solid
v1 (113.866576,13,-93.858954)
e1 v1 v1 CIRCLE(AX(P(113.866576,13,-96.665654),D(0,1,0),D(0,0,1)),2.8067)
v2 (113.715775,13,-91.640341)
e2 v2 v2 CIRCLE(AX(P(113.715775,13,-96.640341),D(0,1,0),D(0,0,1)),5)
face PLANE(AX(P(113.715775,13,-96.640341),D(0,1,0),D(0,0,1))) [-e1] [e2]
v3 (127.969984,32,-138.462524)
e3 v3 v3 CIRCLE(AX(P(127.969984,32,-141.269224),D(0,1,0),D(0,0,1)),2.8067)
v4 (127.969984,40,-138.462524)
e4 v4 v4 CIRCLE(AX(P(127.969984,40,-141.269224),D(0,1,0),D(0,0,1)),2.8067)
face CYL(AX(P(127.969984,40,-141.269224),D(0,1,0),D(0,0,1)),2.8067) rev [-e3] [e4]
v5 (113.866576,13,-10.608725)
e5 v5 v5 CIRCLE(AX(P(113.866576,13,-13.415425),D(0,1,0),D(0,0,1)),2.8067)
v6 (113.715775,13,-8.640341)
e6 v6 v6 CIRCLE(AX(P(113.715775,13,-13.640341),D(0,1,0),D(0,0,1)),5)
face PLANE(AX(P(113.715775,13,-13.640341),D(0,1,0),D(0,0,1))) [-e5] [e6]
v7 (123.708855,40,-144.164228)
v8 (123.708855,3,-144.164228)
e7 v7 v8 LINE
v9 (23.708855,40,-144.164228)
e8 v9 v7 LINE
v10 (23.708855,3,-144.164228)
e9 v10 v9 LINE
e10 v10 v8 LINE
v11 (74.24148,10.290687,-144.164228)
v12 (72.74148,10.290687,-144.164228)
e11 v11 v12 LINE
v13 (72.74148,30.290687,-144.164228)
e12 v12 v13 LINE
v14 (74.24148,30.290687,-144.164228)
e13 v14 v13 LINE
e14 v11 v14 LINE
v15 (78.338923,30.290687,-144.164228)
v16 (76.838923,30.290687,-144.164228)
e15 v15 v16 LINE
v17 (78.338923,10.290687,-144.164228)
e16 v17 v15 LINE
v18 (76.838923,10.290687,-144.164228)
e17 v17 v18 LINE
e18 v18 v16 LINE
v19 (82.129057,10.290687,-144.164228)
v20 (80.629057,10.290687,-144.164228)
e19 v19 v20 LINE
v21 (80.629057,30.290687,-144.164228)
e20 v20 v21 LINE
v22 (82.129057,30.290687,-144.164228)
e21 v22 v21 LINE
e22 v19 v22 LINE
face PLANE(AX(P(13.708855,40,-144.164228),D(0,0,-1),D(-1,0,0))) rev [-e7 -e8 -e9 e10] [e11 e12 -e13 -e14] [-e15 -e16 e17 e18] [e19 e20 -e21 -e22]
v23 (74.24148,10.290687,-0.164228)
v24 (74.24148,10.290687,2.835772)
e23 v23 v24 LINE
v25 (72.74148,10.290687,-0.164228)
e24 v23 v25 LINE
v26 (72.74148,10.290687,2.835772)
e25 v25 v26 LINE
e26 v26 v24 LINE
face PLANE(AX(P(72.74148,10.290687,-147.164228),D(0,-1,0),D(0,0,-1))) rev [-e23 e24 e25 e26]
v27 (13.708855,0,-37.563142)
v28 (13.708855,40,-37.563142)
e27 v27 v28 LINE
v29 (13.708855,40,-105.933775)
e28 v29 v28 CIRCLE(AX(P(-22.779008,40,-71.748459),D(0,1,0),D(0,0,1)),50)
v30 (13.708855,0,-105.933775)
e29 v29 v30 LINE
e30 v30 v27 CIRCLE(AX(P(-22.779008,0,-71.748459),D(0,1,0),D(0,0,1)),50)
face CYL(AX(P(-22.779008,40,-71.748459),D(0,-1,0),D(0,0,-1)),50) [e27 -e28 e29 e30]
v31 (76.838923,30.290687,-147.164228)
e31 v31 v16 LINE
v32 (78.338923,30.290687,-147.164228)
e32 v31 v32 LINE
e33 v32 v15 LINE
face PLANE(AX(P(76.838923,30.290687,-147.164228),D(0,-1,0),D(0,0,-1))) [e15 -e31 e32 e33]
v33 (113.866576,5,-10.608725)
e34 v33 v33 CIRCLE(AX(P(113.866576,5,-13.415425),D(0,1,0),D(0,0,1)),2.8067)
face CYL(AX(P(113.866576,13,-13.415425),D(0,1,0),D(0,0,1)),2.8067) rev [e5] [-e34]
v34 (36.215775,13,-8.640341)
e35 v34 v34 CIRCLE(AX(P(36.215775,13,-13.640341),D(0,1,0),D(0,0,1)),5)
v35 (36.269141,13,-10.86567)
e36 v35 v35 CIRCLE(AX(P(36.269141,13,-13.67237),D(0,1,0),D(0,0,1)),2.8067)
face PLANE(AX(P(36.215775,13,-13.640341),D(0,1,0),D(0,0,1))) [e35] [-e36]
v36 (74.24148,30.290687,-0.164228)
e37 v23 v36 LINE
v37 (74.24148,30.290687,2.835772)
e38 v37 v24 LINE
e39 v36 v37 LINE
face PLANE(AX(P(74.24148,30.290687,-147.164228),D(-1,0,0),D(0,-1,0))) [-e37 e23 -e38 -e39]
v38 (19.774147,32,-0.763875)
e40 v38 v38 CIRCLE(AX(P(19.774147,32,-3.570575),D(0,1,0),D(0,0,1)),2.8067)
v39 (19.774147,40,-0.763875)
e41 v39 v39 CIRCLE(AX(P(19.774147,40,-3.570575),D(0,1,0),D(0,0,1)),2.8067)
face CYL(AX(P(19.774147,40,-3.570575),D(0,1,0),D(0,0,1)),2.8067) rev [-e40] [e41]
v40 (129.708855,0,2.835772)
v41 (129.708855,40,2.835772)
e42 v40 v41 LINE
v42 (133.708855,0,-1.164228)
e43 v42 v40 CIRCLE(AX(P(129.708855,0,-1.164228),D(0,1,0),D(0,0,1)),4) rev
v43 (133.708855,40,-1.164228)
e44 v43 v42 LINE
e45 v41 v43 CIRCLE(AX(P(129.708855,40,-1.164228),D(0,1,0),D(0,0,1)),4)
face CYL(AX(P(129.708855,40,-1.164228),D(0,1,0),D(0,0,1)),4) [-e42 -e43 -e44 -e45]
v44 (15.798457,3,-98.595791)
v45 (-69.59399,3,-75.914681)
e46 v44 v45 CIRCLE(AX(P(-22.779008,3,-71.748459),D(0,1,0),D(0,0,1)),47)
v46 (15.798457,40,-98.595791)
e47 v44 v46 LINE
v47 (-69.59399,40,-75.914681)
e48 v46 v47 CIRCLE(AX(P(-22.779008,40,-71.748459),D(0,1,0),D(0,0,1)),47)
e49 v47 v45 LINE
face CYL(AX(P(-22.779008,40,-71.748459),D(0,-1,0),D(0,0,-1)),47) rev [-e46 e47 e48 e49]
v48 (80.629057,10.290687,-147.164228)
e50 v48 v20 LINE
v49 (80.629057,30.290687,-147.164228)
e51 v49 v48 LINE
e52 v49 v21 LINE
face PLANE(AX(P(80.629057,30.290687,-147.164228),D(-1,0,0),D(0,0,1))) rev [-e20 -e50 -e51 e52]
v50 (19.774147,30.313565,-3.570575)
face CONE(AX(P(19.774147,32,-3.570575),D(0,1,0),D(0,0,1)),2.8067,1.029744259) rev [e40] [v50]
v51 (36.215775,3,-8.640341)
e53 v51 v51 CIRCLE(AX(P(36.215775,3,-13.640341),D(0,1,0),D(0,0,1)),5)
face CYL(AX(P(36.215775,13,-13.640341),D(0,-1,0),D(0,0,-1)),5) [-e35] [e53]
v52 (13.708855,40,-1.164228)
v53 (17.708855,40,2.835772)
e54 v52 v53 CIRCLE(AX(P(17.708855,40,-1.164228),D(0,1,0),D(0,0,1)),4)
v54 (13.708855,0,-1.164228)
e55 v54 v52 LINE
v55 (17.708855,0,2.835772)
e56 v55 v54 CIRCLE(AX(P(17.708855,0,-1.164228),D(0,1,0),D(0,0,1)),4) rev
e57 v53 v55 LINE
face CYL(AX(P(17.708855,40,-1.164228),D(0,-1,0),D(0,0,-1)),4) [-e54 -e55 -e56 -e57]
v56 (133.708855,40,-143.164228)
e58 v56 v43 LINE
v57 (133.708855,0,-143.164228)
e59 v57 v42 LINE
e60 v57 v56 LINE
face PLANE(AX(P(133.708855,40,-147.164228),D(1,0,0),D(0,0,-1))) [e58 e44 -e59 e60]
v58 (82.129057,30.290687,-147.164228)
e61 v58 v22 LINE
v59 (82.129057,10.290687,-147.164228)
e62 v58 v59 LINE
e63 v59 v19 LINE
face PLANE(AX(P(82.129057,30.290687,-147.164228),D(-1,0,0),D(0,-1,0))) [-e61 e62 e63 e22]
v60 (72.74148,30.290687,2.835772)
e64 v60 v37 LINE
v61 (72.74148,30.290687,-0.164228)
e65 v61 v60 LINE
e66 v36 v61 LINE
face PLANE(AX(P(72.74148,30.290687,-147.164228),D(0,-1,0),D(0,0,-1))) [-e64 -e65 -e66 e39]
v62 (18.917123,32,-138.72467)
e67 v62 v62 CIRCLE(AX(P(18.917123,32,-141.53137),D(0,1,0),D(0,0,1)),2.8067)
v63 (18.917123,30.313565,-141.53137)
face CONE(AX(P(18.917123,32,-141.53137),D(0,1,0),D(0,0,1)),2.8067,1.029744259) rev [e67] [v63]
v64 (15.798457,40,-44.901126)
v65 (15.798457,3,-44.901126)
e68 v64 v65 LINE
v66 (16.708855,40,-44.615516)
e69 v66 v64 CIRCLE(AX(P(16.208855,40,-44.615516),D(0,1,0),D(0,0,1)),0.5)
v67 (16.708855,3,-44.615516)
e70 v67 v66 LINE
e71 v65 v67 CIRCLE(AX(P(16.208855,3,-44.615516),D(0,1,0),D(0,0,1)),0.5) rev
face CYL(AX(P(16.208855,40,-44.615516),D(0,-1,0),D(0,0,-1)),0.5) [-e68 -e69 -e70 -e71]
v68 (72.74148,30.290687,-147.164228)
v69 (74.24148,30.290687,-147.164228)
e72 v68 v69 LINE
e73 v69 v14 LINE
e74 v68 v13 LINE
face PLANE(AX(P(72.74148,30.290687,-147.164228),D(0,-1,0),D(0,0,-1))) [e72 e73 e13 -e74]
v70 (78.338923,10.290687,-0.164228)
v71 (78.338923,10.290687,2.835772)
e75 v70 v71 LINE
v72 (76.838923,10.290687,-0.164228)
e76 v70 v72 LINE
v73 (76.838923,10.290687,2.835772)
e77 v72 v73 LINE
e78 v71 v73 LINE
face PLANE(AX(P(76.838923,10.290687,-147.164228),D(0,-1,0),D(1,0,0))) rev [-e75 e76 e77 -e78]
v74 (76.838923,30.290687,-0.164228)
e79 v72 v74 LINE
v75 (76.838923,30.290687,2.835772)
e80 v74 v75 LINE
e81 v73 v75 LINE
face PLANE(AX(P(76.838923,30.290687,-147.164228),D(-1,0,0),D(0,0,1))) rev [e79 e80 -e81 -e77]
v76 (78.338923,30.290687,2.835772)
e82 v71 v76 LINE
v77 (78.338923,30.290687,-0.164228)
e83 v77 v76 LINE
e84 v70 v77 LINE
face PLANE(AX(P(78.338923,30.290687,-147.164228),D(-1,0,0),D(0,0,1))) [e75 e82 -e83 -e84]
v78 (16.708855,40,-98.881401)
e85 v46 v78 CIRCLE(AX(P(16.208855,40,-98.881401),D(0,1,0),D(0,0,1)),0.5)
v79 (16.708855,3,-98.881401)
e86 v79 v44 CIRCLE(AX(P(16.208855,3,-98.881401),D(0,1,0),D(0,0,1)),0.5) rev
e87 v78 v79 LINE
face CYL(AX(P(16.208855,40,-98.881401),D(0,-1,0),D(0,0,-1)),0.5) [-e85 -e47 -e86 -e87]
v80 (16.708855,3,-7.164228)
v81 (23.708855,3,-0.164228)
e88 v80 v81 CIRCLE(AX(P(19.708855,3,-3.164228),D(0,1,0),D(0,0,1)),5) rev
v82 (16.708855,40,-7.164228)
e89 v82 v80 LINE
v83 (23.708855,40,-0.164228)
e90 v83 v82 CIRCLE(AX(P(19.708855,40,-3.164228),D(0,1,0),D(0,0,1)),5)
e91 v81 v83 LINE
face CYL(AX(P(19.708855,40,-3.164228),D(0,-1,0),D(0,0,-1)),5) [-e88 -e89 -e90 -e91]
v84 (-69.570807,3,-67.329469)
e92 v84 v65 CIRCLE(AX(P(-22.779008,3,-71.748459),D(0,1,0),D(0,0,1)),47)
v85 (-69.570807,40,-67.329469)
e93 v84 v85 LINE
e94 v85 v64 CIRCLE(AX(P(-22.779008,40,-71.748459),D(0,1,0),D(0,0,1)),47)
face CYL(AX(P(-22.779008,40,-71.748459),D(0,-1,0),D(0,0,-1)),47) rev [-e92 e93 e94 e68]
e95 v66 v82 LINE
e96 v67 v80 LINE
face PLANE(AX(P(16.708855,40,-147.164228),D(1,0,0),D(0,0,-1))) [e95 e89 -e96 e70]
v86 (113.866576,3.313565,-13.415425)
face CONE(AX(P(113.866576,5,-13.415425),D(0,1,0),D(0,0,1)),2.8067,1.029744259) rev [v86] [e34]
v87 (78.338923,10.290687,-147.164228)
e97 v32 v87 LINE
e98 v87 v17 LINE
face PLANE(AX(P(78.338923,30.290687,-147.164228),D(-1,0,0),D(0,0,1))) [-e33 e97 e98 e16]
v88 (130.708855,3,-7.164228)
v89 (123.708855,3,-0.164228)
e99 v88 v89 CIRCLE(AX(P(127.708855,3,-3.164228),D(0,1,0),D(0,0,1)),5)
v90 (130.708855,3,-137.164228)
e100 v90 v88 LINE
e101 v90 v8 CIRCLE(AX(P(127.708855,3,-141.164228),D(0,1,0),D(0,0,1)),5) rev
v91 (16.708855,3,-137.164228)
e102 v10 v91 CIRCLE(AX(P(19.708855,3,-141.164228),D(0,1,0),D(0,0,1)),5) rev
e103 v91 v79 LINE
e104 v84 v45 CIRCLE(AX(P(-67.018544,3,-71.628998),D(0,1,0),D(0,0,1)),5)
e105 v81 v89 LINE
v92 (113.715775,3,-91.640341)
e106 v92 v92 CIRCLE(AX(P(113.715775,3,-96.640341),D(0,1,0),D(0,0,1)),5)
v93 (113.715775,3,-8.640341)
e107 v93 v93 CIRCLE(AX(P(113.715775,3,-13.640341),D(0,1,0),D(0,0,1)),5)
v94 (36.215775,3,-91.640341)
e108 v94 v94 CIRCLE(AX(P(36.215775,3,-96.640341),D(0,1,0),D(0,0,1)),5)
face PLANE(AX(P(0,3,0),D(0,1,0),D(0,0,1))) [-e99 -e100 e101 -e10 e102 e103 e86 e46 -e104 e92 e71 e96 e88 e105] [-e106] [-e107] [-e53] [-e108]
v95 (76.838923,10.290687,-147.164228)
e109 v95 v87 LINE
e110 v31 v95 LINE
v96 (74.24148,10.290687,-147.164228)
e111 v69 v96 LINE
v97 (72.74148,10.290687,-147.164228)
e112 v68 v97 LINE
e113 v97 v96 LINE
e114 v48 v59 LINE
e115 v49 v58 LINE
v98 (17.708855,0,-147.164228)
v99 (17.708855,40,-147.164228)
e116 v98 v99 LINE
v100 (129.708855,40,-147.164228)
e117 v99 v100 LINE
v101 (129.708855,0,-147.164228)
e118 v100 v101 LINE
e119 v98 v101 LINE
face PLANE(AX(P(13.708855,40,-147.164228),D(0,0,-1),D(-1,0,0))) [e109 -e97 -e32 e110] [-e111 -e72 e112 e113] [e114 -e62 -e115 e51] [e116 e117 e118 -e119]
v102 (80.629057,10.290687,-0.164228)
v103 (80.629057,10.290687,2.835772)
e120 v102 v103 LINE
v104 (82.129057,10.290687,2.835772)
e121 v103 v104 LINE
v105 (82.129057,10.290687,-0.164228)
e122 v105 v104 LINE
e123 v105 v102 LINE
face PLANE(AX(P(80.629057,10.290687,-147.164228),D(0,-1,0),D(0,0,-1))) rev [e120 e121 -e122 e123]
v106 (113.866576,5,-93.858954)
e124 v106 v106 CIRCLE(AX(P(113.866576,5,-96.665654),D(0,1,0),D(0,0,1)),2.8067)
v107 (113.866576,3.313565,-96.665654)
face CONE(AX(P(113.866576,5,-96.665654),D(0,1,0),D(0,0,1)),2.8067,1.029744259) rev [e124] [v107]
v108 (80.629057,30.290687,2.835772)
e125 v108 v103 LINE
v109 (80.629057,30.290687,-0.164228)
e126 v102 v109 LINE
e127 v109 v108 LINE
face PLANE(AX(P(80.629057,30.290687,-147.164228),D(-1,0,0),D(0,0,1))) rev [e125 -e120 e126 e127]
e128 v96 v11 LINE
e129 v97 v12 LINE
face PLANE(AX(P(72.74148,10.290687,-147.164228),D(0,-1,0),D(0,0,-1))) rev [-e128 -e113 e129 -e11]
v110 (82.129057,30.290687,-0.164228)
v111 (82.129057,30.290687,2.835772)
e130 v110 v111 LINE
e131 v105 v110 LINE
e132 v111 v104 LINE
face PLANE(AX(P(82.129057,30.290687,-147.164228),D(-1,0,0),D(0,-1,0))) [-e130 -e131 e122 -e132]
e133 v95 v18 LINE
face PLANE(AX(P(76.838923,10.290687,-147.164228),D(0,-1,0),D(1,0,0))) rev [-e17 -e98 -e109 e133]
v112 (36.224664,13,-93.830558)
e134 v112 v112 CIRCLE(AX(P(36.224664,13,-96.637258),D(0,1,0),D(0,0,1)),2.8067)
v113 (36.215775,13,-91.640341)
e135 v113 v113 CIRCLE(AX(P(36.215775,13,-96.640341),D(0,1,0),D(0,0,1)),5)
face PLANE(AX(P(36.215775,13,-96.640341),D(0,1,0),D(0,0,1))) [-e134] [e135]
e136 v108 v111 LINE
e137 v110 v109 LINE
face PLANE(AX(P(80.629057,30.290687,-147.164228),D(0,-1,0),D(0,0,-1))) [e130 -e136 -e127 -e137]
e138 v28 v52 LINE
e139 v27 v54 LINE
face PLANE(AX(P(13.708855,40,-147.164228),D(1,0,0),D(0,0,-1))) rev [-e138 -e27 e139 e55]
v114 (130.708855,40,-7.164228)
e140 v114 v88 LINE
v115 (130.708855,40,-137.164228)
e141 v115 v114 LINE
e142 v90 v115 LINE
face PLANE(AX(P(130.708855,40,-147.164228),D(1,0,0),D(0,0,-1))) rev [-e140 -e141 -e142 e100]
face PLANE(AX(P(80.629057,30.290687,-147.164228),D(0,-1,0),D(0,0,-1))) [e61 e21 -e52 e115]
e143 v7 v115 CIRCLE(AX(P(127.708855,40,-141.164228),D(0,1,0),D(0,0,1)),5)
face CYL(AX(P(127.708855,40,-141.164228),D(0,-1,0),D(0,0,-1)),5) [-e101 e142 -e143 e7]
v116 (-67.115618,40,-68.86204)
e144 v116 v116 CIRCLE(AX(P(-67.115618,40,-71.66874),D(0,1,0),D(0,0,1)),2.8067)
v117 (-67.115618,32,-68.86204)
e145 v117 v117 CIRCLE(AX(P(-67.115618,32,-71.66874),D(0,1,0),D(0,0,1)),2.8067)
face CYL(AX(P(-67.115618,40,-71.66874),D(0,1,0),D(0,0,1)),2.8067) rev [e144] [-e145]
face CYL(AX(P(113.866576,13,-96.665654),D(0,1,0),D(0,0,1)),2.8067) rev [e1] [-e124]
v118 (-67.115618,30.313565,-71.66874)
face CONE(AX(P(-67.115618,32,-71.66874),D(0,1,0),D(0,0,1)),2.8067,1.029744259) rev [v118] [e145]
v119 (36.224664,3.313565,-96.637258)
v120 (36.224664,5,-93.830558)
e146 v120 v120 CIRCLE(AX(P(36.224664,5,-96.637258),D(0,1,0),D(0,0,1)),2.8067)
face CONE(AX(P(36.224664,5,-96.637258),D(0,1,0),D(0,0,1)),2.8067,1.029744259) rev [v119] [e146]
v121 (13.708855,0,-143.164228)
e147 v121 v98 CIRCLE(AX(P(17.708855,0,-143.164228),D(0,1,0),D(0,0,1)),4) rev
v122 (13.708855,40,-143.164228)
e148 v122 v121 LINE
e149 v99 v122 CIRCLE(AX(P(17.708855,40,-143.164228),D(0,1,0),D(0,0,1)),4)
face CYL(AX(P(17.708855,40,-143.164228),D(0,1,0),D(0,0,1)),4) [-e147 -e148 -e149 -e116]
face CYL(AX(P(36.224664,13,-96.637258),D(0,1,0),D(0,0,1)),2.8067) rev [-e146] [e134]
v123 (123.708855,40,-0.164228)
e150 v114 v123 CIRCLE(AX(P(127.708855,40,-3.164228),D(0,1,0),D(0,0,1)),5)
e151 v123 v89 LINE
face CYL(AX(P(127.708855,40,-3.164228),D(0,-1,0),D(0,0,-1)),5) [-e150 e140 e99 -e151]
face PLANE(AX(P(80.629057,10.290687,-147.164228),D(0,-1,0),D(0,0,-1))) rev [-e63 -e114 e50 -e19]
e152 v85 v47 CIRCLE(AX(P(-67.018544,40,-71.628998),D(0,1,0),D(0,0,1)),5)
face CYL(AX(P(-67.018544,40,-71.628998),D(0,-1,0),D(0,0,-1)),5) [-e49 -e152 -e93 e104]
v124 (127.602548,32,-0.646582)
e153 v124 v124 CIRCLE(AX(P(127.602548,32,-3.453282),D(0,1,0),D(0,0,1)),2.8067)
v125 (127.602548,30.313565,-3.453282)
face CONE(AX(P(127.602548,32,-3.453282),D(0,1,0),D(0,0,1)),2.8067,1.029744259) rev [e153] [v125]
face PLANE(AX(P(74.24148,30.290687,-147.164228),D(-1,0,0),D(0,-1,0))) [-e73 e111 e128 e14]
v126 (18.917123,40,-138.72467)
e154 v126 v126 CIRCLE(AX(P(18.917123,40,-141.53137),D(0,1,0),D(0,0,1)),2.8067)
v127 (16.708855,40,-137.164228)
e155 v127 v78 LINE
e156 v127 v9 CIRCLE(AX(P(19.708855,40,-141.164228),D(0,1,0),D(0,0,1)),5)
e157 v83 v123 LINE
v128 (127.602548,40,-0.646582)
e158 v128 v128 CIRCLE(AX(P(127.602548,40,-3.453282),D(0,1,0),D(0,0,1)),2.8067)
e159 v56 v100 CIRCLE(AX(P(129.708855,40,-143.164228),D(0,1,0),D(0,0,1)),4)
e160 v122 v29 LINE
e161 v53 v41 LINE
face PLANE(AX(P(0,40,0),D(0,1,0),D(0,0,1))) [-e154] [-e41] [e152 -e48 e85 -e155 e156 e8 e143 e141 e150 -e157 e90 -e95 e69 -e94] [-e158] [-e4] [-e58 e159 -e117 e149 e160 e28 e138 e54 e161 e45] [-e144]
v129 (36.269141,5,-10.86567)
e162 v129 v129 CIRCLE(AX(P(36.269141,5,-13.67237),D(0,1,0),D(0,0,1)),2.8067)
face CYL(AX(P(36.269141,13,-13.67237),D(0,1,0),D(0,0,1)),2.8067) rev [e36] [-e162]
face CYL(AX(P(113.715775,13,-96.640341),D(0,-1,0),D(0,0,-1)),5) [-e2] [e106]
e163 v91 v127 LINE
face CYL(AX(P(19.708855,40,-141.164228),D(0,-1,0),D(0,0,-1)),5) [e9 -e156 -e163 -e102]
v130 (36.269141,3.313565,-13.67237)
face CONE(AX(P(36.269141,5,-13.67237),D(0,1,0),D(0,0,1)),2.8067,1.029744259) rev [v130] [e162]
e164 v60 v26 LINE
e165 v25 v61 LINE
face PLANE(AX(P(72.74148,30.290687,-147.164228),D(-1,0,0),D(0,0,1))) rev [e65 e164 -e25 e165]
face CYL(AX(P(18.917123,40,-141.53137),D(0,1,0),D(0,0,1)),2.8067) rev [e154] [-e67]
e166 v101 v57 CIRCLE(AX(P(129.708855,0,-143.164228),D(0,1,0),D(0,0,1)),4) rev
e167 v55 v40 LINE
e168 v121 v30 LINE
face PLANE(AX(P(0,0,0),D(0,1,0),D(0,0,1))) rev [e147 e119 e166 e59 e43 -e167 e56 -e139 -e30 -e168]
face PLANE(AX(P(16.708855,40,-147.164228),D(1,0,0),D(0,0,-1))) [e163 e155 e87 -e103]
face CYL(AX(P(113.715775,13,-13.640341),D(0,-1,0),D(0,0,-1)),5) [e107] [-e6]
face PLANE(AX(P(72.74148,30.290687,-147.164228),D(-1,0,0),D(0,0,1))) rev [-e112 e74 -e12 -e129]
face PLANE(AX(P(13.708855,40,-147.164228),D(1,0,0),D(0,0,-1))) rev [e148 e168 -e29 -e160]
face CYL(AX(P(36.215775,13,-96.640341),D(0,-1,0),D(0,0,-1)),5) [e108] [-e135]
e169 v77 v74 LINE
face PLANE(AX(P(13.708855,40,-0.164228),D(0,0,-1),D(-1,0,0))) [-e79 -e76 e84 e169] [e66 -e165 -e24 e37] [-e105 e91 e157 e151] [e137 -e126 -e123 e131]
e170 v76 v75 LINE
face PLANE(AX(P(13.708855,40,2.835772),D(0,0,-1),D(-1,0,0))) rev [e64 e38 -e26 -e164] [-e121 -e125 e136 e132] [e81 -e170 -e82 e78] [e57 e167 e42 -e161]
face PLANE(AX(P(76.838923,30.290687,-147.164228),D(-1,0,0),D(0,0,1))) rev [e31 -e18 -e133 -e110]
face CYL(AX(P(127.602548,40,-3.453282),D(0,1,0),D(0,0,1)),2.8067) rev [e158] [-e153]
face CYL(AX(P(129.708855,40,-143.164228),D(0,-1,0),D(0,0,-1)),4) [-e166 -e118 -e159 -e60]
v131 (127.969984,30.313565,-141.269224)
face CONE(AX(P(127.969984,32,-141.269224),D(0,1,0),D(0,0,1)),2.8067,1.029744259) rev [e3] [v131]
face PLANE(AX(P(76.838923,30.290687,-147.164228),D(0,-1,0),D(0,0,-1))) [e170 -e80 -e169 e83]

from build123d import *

# Parameters (mm, degrees)
SKETCH8_W                      = 120
SKETCH8_H                      = 150
BOSS_EXTRUDE3_DEPTH            = 40
SKETCH9_R                      = 50
BOSS_EXTRUDE4_DEPTH            = 40
SHELL1_START                   = 3
SHELL1_DEPTH                   = 37
SKETCH17_R                     = 5
BOSS_EXTRUDE6_DEPTH            = 10
CUT_EXTRUDE9_DEPTH             = 203.818558951
CUT_EXTRUDE9_DEPTH_BACK        = 203.818558951
SKETCH11_W                     = 1.5
SKETCH11_H                     = 20
CUT_EXTRUDE10_DEPTH            = 205.88547515
CUT_EXTRUDE10_DEPTH_BACK       = 205.88547515
SKETCH12_W                     = 1.5
SKETCH12_H                     = 20
CUT_EXTRUDE11_DEPTH            = 203.818558951
CUT_EXTRUDE11_DEPTH_BACK       = 203.818558951
SKETCH15_W                     = 1.5
SKETCH15_H                     = 20
SKETCH28_R                     = 5
BOSS_EXTRUDE7_DEPTH            = 37
SKETCH29_R                     = 5
BOSS_EXTRUDE8_DEPTH            = 40
SKETCH30_R                     = 5
BOSS_EXTRUDE9_DEPTH            = 40
SKETCH31_R                     = 5
BOSS_EXTRUDE10_DEPTH           = 37
SKETCH32_R                     = 5
BOSS_EXTRUDE11_DEPTH           = 37
F_2_0_221_DIAMETER_HOLE1_D     = 5.6134
F_2_0_221_DIAMETER_HOLE1_DEPTH = 8
F_2_0_221_DIAMETER_HOLE1_TIP   = 1.686435499
F_2_0_221_DIAMETER_HOLE2_D     = 5.6134
F_2_0_221_DIAMETER_HOLE2_DEPTH = 8
F_2_0_221_DIAMETER_HOLE2_TIP   = 1.686435499
FILLET3_R                      = 4
FILLET2_R                      = 0.5


# Read off the part's stored shape, not the designer's step: Shell1
with BuildPart() as part:
    # Sketch8 → Boss-Extrude3 (new body)
    with BuildSketch(Plane(origin=(0, 0, 0), x_dir=(1, 0, 0), z_dir=(0, 1, 0))):
        with Locations((73.708855083, 72.164227744)):
            Rectangle(SKETCH8_W, SKETCH8_H)
    extrude(amount=BOSS_EXTRUDE3_DEPTH)

    # Sketch9 → Boss-Extrude4 (add)
    with BuildSketch(Plane(origin=(0, 0, 0), x_dir=(1, 0, 0), z_dir=(0, 1, 0))):
        with Locations((-22.779007595, 71.748458752)):
            Circle(SKETCH9_R)
    extrude(amount=BOSS_EXTRUDE4_DEPTH)

    # Shell1 outline → Shell1 (cut)
    with BuildSketch(Plane(origin=(0, 0, 0), x_dir=(1, 0, 0), z_dir=(0, 1, 0)).offset(SHELL1_START)):
        with BuildLine():
            Line((16.708855083, 46.259074664), (16.708855083, 0.164227744))
            Line((16.708855083, 0.164227744), (130.708855083, 0.164227744))
            Line((130.708855083, 0.164227744), (130.708855083, 144.164227744))
            Line((130.708855083, 144.164227744), (16.708855083, 144.164227744))
            Line((16.708855083, 144.164227744), (16.708855083, 97.237842839))
            ThreePointArc((16.708855083, 97.237842839), (-69.779007595, 71.748458751), (16.708855083, 46.259074664))
        make_face()
    extrude(amount=SHELL1_DEPTH, mode=Mode.SUBTRACT)

    # Sketch17 → Boss-Extrude6 (add)
    with BuildSketch(Plane(origin=(1.848761015, 3, -2.465014687), x_dir=(1, 0, 0), z_dir=(0, 1, 0))):
        with Locations(Location((111.867013496, 11.175325825, 0), (0, 0, 270))):
            Circle(SKETCH17_R)
        with Locations(Location((34.367013496, 11.175325825, 0), (0, 0, 270))):
            Circle(SKETCH17_R)
        with Locations(Location((111.867013496, 94.175325825, 0), (0, 0, 270))):
            Circle(SKETCH17_R)
        with Locations(Location((34.367013496, 94.175325825, 0), (0, 0, 270))):
            Circle(SKETCH17_R)
    extrude(amount=BOSS_EXTRUDE6_DEPTH)

    # Sketch11 → Cut-Extrude9 (cut, two sides: drawn at the far end of the back side and taken through both)
    with BuildSketch(Plane.XY.offset(-CUT_EXTRUDE9_DEPTH_BACK)):
        with Locations((73.491480368, 20.290686907)):
            Rectangle(SKETCH11_W, SKETCH11_H)
    extrude(amount=CUT_EXTRUDE9_DEPTH + CUT_EXTRUDE9_DEPTH_BACK, mode=Mode.SUBTRACT)

    # Sketch12 → Cut-Extrude10 (cut, two sides: drawn at the far end of the back side and taken through both)
    with BuildSketch(Plane.XY.offset(2.835772256).offset(-CUT_EXTRUDE10_DEPTH_BACK)):
        with Locations((77.588922832, 20.290686907)):
            Rectangle(SKETCH12_W, SKETCH12_H)
    extrude(amount=CUT_EXTRUDE10_DEPTH + CUT_EXTRUDE10_DEPTH_BACK, mode=Mode.SUBTRACT)

    # Sketch15 → Cut-Extrude11 (cut, two sides: drawn at the far end of the back side and taken through both)
    with BuildSketch(Plane.XY.offset(-CUT_EXTRUDE11_DEPTH_BACK)):
        with Locations((81.379057112, 20.290686907)):
            Rectangle(SKETCH15_W, SKETCH15_H)
    extrude(amount=CUT_EXTRUDE11_DEPTH + CUT_EXTRUDE11_DEPTH_BACK, mode=Mode.SUBTRACT)

    # Sketch28 → Boss-Extrude7 (add)
    with BuildSketch(Plane(origin=(0, 3, 0), x_dir=(1, 0, 0), z_dir=(0, 1, 0))):
        with Locations((19.708855083, 141.164227744)):
            Circle(SKETCH28_R)
    extrude(amount=BOSS_EXTRUDE7_DEPTH)

    # Sketch29 → Boss-Extrude8 (add)
    with BuildSketch(Plane(origin=(0, 0, 0), x_dir=(1, 0, 0), z_dir=(0, 1, 0))):
        with Locations((19.708855083, 3.164227744)):
            Circle(SKETCH29_R)
    extrude(amount=BOSS_EXTRUDE8_DEPTH)

    # Sketch30 → Boss-Extrude9 (add)
    with BuildSketch(Plane(origin=(0, 0, 0), x_dir=(1, 0, 0), z_dir=(0, 1, 0))):
        with Locations((127.708855083, 141.164227744)):
            Circle(SKETCH30_R)
    extrude(amount=BOSS_EXTRUDE9_DEPTH)

    # Sketch31 → Boss-Extrude10 (add)
    with BuildSketch(Plane(origin=(0, 3, 0), x_dir=(1, 0, 0), z_dir=(0, 1, 0))):
        with Locations((127.708855083, 3.164227744)):
            Circle(SKETCH31_R)
    extrude(amount=BOSS_EXTRUDE10_DEPTH)

    # Sketch32 → Boss-Extrude11 (add)
    with BuildSketch(Plane(origin=(0, 3, 0), x_dir=(1, 0, 0), z_dir=(0, 1, 0))):
        with Locations((-67.018543515, 71.628998297)):
            Circle(SKETCH32_R)
    extrude(amount=BOSS_EXTRUDE11_DEPTH)

    # #2 (0.221) Diameter Hole1
    with Locations(Plane(origin=(0, 40, 0), x_dir=(1, 0, 0), z_dir=(0, 1, 0))):
        with Locations((18.917123201, 141.531370062), (127.969984407, 141.269223761), (127.602547564, 3.45328248), (19.774147178, 3.570575466), (-67.115618064, 71.668740496)):
            Hole(F_2_0_221_DIAMETER_HOLE1_D / 2, depth=F_2_0_221_DIAMETER_HOLE1_DEPTH)
            with Locations((0, 0, -(F_2_0_221_DIAMETER_HOLE1_DEPTH + F_2_0_221_DIAMETER_HOLE1_TIP / 2))):  # 118° drill point
                Cone(0, F_2_0_221_DIAMETER_HOLE1_D / 2, F_2_0_221_DIAMETER_HOLE1_TIP, mode=Mode.SUBTRACT)

    # #2 (0.221) Diameter Hole2
    with Locations(Plane(origin=(0, 13, 0), x_dir=(1, 0, 0), z_dir=(0, 1, 0))):
        with Locations((113.866576204, 96.665654076), (36.269140625, 13.672370328), (113.866576204, 13.415425177), (36.224664422, 96.637257854)):
            Hole(F_2_0_221_DIAMETER_HOLE2_D / 2, depth=F_2_0_221_DIAMETER_HOLE2_DEPTH)
            with Locations((0, 0, -(F_2_0_221_DIAMETER_HOLE2_DEPTH + F_2_0_221_DIAMETER_HOLE2_TIP / 2))):  # 118° drill point
                Cone(0, F_2_0_221_DIAMETER_HOLE2_D / 2, F_2_0_221_DIAMETER_HOLE2_TIP, mode=Mode.SUBTRACT)

    # Fillet3
    fillet3_edges = [part.edges().sort_by_distance(p)[0] for p in [
        (13.708855083, 20, -147.164227744),
        (133.708855083, 20, -147.164227744),
        (133.708855083, 20, 2.835772256),
        (13.708855083, 20, 2.835772256),
    ]]
    fillet(fillet3_edges, radius=FILLET3_R)

    # Fillet2
    fillet2_edges = [part.edges().sort_by_distance(p)[0] for p in [
        (16.708855083, 21.5, -46.259074664),
        (16.708855083, 21.5, -97.237842839),
    ]]
    fillet(fillet2_edges, radius=FILLET2_R)


solid = part.part
